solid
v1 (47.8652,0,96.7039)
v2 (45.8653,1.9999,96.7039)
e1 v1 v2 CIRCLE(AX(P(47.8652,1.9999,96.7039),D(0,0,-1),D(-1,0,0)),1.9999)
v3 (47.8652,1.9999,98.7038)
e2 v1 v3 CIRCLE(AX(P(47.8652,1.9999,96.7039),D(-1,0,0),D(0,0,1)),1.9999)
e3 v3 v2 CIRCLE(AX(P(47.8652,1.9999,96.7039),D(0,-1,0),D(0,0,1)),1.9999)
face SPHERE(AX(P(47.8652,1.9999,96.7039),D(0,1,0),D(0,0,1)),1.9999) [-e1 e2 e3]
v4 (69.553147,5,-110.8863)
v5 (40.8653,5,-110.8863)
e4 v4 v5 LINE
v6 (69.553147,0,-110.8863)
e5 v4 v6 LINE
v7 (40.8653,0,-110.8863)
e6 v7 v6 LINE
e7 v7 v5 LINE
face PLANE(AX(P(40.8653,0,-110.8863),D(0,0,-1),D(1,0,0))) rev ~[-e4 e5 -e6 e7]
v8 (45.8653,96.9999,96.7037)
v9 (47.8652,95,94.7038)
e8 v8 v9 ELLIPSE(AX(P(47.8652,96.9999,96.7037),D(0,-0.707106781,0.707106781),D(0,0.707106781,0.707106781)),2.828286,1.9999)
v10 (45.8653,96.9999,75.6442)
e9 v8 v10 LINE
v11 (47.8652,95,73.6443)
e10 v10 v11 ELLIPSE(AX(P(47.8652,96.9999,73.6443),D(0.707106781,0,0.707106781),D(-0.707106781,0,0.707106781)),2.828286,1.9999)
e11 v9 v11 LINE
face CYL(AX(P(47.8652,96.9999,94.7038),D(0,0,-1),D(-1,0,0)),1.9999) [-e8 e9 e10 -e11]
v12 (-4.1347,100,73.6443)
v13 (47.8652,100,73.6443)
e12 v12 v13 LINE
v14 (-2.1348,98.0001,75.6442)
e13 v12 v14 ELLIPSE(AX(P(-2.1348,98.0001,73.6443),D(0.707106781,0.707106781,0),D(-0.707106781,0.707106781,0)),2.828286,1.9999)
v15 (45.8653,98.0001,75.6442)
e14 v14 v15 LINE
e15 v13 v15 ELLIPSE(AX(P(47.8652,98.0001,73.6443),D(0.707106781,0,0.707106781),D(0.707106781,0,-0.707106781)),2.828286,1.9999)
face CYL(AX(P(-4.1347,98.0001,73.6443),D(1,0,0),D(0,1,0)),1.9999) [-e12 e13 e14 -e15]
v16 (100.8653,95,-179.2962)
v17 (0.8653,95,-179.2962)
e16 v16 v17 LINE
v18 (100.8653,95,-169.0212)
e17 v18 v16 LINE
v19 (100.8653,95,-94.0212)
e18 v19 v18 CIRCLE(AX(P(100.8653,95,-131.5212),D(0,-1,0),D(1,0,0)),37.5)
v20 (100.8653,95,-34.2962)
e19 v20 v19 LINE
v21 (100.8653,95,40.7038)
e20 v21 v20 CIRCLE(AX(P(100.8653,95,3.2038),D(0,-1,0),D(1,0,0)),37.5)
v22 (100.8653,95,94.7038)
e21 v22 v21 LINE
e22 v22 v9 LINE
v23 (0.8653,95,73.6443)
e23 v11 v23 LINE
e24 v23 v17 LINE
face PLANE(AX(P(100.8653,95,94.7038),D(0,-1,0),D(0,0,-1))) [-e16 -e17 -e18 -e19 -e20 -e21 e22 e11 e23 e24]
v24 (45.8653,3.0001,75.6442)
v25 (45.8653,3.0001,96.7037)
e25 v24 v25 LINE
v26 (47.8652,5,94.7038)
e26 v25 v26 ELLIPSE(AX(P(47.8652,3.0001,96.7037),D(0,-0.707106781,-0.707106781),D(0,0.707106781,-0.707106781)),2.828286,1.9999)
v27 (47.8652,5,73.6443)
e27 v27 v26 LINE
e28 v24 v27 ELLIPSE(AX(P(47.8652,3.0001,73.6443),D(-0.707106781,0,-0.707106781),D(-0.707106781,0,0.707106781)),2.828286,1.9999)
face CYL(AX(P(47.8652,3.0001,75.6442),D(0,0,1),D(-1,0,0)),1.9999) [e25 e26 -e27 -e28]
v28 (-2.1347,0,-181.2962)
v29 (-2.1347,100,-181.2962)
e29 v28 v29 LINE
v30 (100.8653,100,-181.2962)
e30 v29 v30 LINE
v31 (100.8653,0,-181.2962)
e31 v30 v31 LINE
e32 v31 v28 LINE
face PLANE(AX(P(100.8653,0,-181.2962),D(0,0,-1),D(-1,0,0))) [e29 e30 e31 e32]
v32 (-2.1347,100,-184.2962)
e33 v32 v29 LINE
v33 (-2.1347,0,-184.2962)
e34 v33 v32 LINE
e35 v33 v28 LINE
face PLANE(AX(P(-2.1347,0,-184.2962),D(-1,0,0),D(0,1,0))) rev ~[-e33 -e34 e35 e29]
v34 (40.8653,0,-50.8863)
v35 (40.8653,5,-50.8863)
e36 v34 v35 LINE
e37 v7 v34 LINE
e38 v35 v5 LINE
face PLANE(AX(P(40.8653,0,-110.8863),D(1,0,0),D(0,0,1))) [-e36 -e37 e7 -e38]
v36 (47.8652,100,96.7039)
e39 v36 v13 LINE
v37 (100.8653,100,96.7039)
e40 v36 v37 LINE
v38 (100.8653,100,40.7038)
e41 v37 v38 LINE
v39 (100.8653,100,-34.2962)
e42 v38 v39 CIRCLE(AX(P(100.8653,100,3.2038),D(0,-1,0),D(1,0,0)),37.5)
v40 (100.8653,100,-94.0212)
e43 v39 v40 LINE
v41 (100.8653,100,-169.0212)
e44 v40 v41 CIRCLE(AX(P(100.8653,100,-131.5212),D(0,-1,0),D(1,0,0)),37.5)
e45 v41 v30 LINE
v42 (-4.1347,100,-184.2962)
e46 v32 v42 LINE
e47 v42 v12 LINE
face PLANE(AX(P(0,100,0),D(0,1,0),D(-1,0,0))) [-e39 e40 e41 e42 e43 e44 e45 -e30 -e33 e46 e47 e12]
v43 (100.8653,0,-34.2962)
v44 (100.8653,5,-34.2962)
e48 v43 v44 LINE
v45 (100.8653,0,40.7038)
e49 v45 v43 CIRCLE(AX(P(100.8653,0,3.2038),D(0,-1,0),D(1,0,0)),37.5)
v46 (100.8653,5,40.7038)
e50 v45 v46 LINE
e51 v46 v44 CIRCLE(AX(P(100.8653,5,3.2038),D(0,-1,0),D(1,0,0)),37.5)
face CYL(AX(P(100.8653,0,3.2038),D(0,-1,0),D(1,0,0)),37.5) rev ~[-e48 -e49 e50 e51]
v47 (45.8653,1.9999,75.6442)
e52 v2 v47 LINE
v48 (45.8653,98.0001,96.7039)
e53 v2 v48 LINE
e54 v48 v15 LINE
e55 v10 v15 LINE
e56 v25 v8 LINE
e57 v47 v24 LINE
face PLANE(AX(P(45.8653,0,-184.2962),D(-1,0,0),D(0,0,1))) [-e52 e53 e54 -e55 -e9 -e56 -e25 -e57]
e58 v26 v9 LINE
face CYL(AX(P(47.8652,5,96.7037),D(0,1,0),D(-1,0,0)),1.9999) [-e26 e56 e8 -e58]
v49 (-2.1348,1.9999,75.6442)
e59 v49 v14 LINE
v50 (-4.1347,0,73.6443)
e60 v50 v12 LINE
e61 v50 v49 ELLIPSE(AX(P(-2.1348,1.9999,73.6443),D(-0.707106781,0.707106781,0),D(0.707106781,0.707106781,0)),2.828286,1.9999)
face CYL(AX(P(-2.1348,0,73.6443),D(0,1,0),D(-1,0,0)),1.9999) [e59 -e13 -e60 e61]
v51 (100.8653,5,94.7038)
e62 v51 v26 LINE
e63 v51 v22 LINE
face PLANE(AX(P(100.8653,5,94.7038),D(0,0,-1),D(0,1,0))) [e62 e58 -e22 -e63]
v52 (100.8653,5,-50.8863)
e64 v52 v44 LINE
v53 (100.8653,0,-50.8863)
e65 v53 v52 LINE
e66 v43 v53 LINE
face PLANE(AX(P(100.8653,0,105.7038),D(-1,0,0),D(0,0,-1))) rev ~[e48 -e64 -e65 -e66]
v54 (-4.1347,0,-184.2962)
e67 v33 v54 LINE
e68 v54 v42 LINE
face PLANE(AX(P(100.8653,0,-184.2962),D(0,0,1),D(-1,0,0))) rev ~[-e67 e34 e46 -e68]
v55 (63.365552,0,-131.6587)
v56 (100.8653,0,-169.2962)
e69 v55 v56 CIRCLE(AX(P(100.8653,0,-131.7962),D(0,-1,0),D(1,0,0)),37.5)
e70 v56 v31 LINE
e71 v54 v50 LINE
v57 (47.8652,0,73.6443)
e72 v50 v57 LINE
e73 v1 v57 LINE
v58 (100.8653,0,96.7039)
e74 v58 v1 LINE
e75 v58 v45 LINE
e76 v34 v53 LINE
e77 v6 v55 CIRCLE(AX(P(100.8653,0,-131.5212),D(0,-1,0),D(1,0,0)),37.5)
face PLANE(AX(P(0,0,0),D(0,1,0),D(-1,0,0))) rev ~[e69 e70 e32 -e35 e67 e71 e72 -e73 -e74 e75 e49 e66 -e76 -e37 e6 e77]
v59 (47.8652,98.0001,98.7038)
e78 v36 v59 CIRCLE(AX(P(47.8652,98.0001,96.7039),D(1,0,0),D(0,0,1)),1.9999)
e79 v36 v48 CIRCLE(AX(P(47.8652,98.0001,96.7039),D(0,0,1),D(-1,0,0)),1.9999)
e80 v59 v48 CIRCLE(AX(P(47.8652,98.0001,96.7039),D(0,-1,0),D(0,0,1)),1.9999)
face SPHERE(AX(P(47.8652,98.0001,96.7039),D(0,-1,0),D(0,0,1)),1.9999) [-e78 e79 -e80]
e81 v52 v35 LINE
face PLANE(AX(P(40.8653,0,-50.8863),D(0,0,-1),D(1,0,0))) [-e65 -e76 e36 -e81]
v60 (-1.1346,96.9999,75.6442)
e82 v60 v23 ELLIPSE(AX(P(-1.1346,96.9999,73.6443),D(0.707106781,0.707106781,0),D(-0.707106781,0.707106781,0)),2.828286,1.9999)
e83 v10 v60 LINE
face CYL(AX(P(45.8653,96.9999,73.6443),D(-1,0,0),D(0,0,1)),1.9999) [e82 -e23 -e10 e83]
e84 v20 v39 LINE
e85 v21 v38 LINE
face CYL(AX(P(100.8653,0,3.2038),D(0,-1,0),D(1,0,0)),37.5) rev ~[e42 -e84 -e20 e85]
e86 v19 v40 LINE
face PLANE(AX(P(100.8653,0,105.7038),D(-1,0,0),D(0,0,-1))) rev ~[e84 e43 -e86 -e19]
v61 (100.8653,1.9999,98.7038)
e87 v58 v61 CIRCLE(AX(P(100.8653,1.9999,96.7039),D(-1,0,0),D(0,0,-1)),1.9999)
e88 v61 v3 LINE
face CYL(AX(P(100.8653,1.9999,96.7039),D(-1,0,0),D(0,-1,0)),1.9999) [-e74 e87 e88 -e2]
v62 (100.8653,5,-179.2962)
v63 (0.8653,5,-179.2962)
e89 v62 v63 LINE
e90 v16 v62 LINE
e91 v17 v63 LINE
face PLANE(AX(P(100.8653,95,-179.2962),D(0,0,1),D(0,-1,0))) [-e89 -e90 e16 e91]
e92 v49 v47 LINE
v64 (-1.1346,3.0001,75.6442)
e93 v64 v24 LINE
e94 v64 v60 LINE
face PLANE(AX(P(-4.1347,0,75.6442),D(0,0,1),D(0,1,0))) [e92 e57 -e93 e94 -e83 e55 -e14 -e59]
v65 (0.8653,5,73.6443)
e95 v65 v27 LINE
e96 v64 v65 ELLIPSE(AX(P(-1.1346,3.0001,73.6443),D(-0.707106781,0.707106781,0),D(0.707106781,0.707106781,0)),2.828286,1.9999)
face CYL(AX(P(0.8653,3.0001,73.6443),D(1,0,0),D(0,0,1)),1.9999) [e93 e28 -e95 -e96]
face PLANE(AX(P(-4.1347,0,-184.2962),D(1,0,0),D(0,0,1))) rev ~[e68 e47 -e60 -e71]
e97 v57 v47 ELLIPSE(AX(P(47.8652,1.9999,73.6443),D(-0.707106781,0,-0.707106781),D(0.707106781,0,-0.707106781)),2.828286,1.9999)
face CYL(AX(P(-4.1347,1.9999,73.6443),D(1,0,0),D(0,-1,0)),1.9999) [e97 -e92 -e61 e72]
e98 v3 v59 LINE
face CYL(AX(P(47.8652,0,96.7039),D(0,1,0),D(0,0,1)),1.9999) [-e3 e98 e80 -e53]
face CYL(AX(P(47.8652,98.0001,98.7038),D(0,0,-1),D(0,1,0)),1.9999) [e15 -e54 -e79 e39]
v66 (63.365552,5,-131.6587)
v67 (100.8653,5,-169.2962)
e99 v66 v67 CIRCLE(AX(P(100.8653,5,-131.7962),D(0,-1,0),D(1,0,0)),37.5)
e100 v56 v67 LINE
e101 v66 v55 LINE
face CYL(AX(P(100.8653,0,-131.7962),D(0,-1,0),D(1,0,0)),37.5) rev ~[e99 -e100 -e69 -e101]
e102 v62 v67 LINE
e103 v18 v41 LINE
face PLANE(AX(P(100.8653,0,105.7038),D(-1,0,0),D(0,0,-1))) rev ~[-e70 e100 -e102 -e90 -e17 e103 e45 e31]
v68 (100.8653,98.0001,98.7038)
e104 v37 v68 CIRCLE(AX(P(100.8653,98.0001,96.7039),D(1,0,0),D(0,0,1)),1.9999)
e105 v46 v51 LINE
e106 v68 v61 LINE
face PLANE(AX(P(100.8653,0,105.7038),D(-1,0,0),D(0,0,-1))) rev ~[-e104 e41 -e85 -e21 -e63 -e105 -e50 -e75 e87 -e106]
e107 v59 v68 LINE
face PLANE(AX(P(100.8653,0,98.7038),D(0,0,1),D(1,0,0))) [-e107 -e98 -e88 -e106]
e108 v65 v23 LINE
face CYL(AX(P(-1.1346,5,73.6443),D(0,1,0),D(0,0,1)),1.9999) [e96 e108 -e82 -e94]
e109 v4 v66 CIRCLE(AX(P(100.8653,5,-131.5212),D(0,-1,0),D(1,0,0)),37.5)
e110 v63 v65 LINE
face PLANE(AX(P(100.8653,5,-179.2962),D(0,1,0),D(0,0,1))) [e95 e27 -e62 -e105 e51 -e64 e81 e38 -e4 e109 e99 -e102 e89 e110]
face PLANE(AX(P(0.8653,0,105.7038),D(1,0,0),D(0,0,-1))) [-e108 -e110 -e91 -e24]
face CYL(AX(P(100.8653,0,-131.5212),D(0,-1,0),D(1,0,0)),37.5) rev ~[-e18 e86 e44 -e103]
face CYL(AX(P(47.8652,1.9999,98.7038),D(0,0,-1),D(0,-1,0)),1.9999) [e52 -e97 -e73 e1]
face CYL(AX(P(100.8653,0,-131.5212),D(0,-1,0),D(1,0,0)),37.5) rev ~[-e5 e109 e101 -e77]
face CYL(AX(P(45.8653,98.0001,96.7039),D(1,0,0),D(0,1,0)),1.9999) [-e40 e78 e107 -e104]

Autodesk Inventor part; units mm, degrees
ref_plane "YZ Plane" through (0, 0, 0) normal (1, 0, 0) x (0, 1, 0)
ref_plane "XZ Plane" through (0, 0, 0) normal (0, 1, 0) x (-1, 0, 0)
ref_plane "XY Plane" through (0, 0, 0) normal (0, 0, 1) x (1, 0, 0)
sketch "스케치1" plane through (0, 0, 0) normal (0, 1, 0) x (-1, 0, 0)
  line L0 (4.1347, 105.7038) -> (-100.8653, 105.7038)
  line L1 (-100.8653, 105.7038) -> (-100.8653, -184.2962)
  line L2 (-100.8653, -184.2962) -> (4.1347, -184.2962)
  line L3 (4.1347, -184.2962) -> (4.1347, 105.7038)
  point P0 (0, 0)
  dimension "d0" = 105
  dimension "d1" = 290
sketch "스케치2" plane through (0, 0, 0) normal (0, 1, 0) x (-1, 0, 0)
  point P0 (0, 0)
sketch "스케치3" plane through (0, 0, 0) normal (0, 1, 0) x (-1, 0, 0)
  point P0 (0, 0)
sketch "스케치4" plane through (0, 0, 0) normal (0, 1, 0) x (-1, 0, 0)
  point P0 (0, 0)
extrude "돌출1" add sketch "스케치1" along normal blind 100
sketch "스케치5" plane through (100.8653, 0, 105.7038) normal (1, 0, 0) x (0, 0, -1)
  line L0 (0, 0) -> (290, 0) projected
  line L1 (290, 0) -> (285, 0)
  line L2 (285, 0) -> (285, 5)
  line L3 (285, 5) -> (290, 5)
  line L4 (290, 5) -> (290, 0)
  line L5 (290, 0) -> (290, 100) projected
  line L6 (290, 100) -> (285, 100)
  line L7 (285, 100) -> (285, 95)
  line L8 (285, 95) -> (290, 95)
  line L9 (290, 95) -> (290, 100)
  line L10 (285, 5) -> (35, 5)
  line L11 (35, 5) -> (35, 95)
  line L12 (35, 95) -> (285, 95)
  line L13 (285, 95) -> (285, 5)
  point P0 (105.7038, 0)
  dimension "d4" = 5
  dimension "d5" = 5
  dimension "d6" = 5
  dimension "d7" = 5
  dimension "d8" = 250
  dimension "d9" = 90
extrude "돌출2" cut sketch "스케치5" against normal blind 100 contours L10 L11 L12 L13
sketch "스케치6" plane through (100.8653, 0, 105.7038) normal (1, 0, 0) x (0, 0, -1)
  point P0 (105.7038, 0)
sketch "스케치7" plane through (100.8653, 0, 105.7038) normal (1, 0, 0) x (0, 0, -1)
  line L0 (285, 5) -> (35, 5) projected
  line L1 (35, 5) -> (11, 5)
  line L2 (11, 5) -> (11, 95)
  line L3 (11, 95) -> (35, 95)
  line L4 (35, 95) -> (35, 5)
  point P0 (105.7038, 0)
  dimension "d12" = 24
extrude "돌출3" cut sketch "스케치7" against normal blind 100
sketch "스케치8" plane through (-4.1347, 0, 105.7038) normal (0, 0, 1) x (1, 0, 0)
  circle A0 centre (22.6105, 17.0226) radius 10.2543
  point P0 (4.1347, 0)
sketch "스케치11" plane through (-4.1347, 0, -184.2962) normal (-1, 0, 0) x (0, 0, 1)
  point P0 (184.2962, 0)
sketch "스케치9" plane through (-4.1347, 0, -184.2962) normal (-1, 0, 0) x (0, 0, 1)
  line L0 (290, 100) -> (0, 100) projected
  line L1 (0, 100) -> (5, 100)
  line L2 (5, 100) -> (5, 95)
  line L3 (5, 95) -> (0, 95)
  line L4 (0, 95) -> (0, 100)
  line L5 (0, 0) -> (5, 0)
  line L6 (0, 0) -> (290, 0) projected
  line L7 (5, 0) -> (75, 0)
  line L8 (5, 0) -> (75, 0) construction
  line L9 (75, 0) -> (140, 0)
  line L10 (75, 0) -> (184.2962, 0)
  dimension "d15" = 5
  dimension "d16" = 5
  dimension "d17" = 5
  dimension "d18" = 70
  dimension "d19" = 0
  dimension "d20" = 65
sketch "스케치12" plane through (-4.1347, 0, -184.2962) normal (-1, 0, 0) x (0, 0, 1)
  point P0 (184.2962, 0)
sketch "스케치10" plane through (0, 0, 0) normal (0, -1, 0) x (1, 0, 0)
  point P0 (0, 0)
sketch "스케치13" plane through (-4.1347, 0, -184.2962) normal (-1, 0, 0) x (0, 0, 1)
  point P0 (184.2962, 0)
sketch "스케치14" plane through (0, 0, 0) normal (0, -1, 0) x (1, 0, 0)
  line L0 (-4.1347, -184.2962) -> (-4.1347, 105.7038) projected
  line L1 (-4.1347, -110.8863) -> (100.8653, -110.8863)
  line L2 (100.8653, 105.7038) -> (100.8653, -184.2962) projected
  line L3 (100.8653, -110.8863) -> (40.8653, -110.8863)
  line L4 (40.8653, -110.8863) -> (40.8653, -50.8863)
  line L5 (40.8653, -50.8863) -> (100.8653, -50.8863)
  line L6 (100.8653, -50.8863) -> (100.8653, -110.8863)
  point P0 (0, 0)
  dimension "d21" = 60
  dimension "d22" = 60
extrude "돌출4" cut sketch "스케치14" against normal blind 80
sketch "스케치15" plane through (0, 0, 0) normal (0, -1, 0) x (1, 0, 0)
  line L0 (100.8653, -184.2962) -> (-4.1347, -184.2962) projected
  line L1 (100.8653, -184.2962) -> (100.8653, -169.2962)
  line L2 (100.8653, -110.8863) -> (100.8653, -184.2962) projected
  line L3 (100.8653, -169.2962) -> (100.8653, -131.7962)
  circle A0 centre (100.8653, -131.7962) radius 37.5
  point P0 (0, 0)
  dimension "d25" = 15
  dimension "d26" = 37.5
  dimension "d27" = 75
extrude "돌출5" cut sketch "스케치15" against normal blind 80
sketch "스케치16" plane through (0, 0, 0) normal (0, -1, 0) x (1, 0, 0)
  arc A0 (69.7361, -110.8863) -> (100.8653, -169.2962) centre (100.8653, -131.7962) ccw projected
  line L0 (100.8653, -169.2962) -> (100.8653, -94.2962)
  line L1 (100.8653, 94.7038) -> (100.8653, -179.2962) projected
  line L2 (100.8653, -169.2962) -> (175.8653, -169.2962) construction
  line L3 (100.8653, -94.2962) -> (100.8653, -34.2962)
  line L4 (100.8653, -34.2962) -> (100.8653, 3.2038)
  circle A1 centre (100.8653, 3.2038) radius 37.5
  point P0 (0, 0)
  point P1 (100.8653, 40.7038)
  dimension "d30" = 75
  dimension "d31" = 90
  dimension "d32" = 60
  dimension "d33" = 37.5
  dimension "d34" = 180
  dimension "d35" = 75
extrude "돌출6" cut sketch "스케치16" against normal blind 8300 contours L1 A1 picked at (87.6481, -17.8312)
sketch "스케치17" plane through (0, 0, 0) normal (0, -1, 0) x (1, 0, 0)
  line L0 (100.8653, -34.2962) -> (100.8653, -184.2962) projected
  line L1 (100.8653, -184.2962) -> (100.8653, -169.0212)
  line L2 (100.8653, -169.0212) -> (100.8653, -131.5212)
  circle A0 centre (100.8653, -131.5212) radius 37.5
  point P0 (0, 0)
  point P1 (100.8653, -94.0212)
  dimension "d38" = 15.275
  dimension "d39" = 37.5
  dimension "d40" = 75
extrude "돌출7" cut sketch "스케치17" against normal blind 8300 contours L0 A0 picked at (87.6481, -152.5562)
sketch "스케치18" plane through (-4.1347, 0, -184.2962) normal (-1, 0, 0) x (0, 0, 1)
  line L0 (0, 0) -> (0, 100) projected
  line L1 (0, 50) -> (260, 50)
  line L2 (0, 50) -> (260, 50) construction
  point P0 (184.2962, 0)
  dimension "d43" = 260
  dimension "d44" = 0
sketch "스케치19" plane through (-4.1347, 0, -184.2962) normal (-1, 0, 0) x (0, 0, 1)
  line L0 (259.9404, 50.2138) -> (259.9404, 99.3471)
  line L1 (259.9404, 99.3471) -> (259.9404, 100)
  line L2 (290, 100) -> (225, 100) projected
  line L3 (290, 0) -> (225, 0) projected
  line L4 (259.9404, 100) -> (290, 100)
  line L5 (290, 100) -> (290, 0)
  line L6 (290, 0) -> (259.9404, 0)
  line L7 (259.9404, 0) -> (259.9404, 100)
  point P0 (184.2962, 0)
extrude "돌출8" cut sketch "스케치19" against normal blind 50
sketch "스케치24" plane through (100.8653, 0, -184.2962) normal (0, 0, -1) x (-1, 0, 0)
  line L0 (0, 0) -> (0, 5) projected
  line L1 (103, 100) -> (0, 100)
  line L2 (0, 100) -> (0, 0)
  line L3 (0, 0) -> (103, 0)
  line L4 (103, 0) -> (103, 100)
  point P0 (100.8653, 0)
extrude "돌출12" cut sketch "스케치24" against normal blind 3
sketch "스케치26" plane through (100.8653, 0, 105.7038) normal (0, 0, 1) x (1, 0, 0)
  line L0 (-55, 100) -> (0, 100) projected
  line L1 (0, 5) -> (0, 0) projected
  line L2 (-55, 100) -> (0, 100)
  line L3 (0, 100) -> (0, 0)
  line L4 (0, 0) -> (-55, 0)
  line L5 (-55, 0) -> (-55, 100)
  point P0 (-100.8653, 0)
extrude "돌출14" cut sketch "스케치26" against normal blind 7
fillet "모깎기7" radius 2 14 edges at (45.8653, 50, 98.7038) (73.3653, 100, 98.7038) (73.3653, 0, 98.7038) (45.8653, 50, 94.7038) (45.8653, 5, 85.1739) (23.3653, 5, 75.6441) (0.8653, 50, 75.6441) (-4.1347, 50, 75.6441) (23.3653, 95, 75.6441) (20.8653, 100, 75.6441) (20.8653, 0, 75.6441) (45.8653, 95, 85.1739) (45.8653, 100, 87.1739) (45.8653, 0, 87.1739)
sketch "스케치20" plane through (-4.1347, 98, -184.2962) normal (-1, 0, 0) x (0, 0, 1)
  line L0 (99.3624, -73.1284) -> (157.5725, -73.1284)
  line L1 (157.5725, -73.1284) -> (157.5725, -19.1517)
  line L2 (157.5725, -19.1517) -> (99.3624, -19.1517)
  line L3 (99.3624, -19.1517) -> (99.3624, -73.1284)
  point P0 (184.2962, -98)
sketch "스케치21" plane through (-14.1347, 98, -184.2962) normal (-1, 0, 0) x (0, 0, 1)
  line L0 (87.1912, -87.9455) -> (166.5686, -87.9455)
  line L1 (166.5686, -87.9455) -> (166.5686, -6.4514)
  line L2 (166.5686, -6.4514) -> (87.1912, -6.4514)
  line L3 (87.1912, -6.4514) -> (87.1912, -87.9455)
  line L4 (87.1912, -87.9455) -> (166.5686, -6.4514) construction
  line L5 (166.5686, -87.9455) -> (87.1912, -6.4514) construction
  point P0 (184.2962, -98)
  point P1 (126.8799, -47.1984)
sketch "스케치22" plane through (-24.1347, 98, -184.2962) normal (-1, 0, 0) x (0, 0, 1)
  line L0 (162.3351, -80.537) -> (95.6581, -80.537)
  line L1 (95.6581, -80.537) -> (95.6581, -12.8016)
  line L2 (95.6581, -12.8016) -> (162.3351, -12.8016)
  line L3 (162.3351, -12.8016) -> (162.3351, -80.537)
  line L4 (162.3351, -80.537) -> (95.6581, -12.8016) construction
  line L5 (95.6581, -80.537) -> (162.3351, -12.8016) construction
  point P0 (184.2962, -98)
  point P1 (128.9966, -46.6693)
properties part number "차체 뚜껑"
